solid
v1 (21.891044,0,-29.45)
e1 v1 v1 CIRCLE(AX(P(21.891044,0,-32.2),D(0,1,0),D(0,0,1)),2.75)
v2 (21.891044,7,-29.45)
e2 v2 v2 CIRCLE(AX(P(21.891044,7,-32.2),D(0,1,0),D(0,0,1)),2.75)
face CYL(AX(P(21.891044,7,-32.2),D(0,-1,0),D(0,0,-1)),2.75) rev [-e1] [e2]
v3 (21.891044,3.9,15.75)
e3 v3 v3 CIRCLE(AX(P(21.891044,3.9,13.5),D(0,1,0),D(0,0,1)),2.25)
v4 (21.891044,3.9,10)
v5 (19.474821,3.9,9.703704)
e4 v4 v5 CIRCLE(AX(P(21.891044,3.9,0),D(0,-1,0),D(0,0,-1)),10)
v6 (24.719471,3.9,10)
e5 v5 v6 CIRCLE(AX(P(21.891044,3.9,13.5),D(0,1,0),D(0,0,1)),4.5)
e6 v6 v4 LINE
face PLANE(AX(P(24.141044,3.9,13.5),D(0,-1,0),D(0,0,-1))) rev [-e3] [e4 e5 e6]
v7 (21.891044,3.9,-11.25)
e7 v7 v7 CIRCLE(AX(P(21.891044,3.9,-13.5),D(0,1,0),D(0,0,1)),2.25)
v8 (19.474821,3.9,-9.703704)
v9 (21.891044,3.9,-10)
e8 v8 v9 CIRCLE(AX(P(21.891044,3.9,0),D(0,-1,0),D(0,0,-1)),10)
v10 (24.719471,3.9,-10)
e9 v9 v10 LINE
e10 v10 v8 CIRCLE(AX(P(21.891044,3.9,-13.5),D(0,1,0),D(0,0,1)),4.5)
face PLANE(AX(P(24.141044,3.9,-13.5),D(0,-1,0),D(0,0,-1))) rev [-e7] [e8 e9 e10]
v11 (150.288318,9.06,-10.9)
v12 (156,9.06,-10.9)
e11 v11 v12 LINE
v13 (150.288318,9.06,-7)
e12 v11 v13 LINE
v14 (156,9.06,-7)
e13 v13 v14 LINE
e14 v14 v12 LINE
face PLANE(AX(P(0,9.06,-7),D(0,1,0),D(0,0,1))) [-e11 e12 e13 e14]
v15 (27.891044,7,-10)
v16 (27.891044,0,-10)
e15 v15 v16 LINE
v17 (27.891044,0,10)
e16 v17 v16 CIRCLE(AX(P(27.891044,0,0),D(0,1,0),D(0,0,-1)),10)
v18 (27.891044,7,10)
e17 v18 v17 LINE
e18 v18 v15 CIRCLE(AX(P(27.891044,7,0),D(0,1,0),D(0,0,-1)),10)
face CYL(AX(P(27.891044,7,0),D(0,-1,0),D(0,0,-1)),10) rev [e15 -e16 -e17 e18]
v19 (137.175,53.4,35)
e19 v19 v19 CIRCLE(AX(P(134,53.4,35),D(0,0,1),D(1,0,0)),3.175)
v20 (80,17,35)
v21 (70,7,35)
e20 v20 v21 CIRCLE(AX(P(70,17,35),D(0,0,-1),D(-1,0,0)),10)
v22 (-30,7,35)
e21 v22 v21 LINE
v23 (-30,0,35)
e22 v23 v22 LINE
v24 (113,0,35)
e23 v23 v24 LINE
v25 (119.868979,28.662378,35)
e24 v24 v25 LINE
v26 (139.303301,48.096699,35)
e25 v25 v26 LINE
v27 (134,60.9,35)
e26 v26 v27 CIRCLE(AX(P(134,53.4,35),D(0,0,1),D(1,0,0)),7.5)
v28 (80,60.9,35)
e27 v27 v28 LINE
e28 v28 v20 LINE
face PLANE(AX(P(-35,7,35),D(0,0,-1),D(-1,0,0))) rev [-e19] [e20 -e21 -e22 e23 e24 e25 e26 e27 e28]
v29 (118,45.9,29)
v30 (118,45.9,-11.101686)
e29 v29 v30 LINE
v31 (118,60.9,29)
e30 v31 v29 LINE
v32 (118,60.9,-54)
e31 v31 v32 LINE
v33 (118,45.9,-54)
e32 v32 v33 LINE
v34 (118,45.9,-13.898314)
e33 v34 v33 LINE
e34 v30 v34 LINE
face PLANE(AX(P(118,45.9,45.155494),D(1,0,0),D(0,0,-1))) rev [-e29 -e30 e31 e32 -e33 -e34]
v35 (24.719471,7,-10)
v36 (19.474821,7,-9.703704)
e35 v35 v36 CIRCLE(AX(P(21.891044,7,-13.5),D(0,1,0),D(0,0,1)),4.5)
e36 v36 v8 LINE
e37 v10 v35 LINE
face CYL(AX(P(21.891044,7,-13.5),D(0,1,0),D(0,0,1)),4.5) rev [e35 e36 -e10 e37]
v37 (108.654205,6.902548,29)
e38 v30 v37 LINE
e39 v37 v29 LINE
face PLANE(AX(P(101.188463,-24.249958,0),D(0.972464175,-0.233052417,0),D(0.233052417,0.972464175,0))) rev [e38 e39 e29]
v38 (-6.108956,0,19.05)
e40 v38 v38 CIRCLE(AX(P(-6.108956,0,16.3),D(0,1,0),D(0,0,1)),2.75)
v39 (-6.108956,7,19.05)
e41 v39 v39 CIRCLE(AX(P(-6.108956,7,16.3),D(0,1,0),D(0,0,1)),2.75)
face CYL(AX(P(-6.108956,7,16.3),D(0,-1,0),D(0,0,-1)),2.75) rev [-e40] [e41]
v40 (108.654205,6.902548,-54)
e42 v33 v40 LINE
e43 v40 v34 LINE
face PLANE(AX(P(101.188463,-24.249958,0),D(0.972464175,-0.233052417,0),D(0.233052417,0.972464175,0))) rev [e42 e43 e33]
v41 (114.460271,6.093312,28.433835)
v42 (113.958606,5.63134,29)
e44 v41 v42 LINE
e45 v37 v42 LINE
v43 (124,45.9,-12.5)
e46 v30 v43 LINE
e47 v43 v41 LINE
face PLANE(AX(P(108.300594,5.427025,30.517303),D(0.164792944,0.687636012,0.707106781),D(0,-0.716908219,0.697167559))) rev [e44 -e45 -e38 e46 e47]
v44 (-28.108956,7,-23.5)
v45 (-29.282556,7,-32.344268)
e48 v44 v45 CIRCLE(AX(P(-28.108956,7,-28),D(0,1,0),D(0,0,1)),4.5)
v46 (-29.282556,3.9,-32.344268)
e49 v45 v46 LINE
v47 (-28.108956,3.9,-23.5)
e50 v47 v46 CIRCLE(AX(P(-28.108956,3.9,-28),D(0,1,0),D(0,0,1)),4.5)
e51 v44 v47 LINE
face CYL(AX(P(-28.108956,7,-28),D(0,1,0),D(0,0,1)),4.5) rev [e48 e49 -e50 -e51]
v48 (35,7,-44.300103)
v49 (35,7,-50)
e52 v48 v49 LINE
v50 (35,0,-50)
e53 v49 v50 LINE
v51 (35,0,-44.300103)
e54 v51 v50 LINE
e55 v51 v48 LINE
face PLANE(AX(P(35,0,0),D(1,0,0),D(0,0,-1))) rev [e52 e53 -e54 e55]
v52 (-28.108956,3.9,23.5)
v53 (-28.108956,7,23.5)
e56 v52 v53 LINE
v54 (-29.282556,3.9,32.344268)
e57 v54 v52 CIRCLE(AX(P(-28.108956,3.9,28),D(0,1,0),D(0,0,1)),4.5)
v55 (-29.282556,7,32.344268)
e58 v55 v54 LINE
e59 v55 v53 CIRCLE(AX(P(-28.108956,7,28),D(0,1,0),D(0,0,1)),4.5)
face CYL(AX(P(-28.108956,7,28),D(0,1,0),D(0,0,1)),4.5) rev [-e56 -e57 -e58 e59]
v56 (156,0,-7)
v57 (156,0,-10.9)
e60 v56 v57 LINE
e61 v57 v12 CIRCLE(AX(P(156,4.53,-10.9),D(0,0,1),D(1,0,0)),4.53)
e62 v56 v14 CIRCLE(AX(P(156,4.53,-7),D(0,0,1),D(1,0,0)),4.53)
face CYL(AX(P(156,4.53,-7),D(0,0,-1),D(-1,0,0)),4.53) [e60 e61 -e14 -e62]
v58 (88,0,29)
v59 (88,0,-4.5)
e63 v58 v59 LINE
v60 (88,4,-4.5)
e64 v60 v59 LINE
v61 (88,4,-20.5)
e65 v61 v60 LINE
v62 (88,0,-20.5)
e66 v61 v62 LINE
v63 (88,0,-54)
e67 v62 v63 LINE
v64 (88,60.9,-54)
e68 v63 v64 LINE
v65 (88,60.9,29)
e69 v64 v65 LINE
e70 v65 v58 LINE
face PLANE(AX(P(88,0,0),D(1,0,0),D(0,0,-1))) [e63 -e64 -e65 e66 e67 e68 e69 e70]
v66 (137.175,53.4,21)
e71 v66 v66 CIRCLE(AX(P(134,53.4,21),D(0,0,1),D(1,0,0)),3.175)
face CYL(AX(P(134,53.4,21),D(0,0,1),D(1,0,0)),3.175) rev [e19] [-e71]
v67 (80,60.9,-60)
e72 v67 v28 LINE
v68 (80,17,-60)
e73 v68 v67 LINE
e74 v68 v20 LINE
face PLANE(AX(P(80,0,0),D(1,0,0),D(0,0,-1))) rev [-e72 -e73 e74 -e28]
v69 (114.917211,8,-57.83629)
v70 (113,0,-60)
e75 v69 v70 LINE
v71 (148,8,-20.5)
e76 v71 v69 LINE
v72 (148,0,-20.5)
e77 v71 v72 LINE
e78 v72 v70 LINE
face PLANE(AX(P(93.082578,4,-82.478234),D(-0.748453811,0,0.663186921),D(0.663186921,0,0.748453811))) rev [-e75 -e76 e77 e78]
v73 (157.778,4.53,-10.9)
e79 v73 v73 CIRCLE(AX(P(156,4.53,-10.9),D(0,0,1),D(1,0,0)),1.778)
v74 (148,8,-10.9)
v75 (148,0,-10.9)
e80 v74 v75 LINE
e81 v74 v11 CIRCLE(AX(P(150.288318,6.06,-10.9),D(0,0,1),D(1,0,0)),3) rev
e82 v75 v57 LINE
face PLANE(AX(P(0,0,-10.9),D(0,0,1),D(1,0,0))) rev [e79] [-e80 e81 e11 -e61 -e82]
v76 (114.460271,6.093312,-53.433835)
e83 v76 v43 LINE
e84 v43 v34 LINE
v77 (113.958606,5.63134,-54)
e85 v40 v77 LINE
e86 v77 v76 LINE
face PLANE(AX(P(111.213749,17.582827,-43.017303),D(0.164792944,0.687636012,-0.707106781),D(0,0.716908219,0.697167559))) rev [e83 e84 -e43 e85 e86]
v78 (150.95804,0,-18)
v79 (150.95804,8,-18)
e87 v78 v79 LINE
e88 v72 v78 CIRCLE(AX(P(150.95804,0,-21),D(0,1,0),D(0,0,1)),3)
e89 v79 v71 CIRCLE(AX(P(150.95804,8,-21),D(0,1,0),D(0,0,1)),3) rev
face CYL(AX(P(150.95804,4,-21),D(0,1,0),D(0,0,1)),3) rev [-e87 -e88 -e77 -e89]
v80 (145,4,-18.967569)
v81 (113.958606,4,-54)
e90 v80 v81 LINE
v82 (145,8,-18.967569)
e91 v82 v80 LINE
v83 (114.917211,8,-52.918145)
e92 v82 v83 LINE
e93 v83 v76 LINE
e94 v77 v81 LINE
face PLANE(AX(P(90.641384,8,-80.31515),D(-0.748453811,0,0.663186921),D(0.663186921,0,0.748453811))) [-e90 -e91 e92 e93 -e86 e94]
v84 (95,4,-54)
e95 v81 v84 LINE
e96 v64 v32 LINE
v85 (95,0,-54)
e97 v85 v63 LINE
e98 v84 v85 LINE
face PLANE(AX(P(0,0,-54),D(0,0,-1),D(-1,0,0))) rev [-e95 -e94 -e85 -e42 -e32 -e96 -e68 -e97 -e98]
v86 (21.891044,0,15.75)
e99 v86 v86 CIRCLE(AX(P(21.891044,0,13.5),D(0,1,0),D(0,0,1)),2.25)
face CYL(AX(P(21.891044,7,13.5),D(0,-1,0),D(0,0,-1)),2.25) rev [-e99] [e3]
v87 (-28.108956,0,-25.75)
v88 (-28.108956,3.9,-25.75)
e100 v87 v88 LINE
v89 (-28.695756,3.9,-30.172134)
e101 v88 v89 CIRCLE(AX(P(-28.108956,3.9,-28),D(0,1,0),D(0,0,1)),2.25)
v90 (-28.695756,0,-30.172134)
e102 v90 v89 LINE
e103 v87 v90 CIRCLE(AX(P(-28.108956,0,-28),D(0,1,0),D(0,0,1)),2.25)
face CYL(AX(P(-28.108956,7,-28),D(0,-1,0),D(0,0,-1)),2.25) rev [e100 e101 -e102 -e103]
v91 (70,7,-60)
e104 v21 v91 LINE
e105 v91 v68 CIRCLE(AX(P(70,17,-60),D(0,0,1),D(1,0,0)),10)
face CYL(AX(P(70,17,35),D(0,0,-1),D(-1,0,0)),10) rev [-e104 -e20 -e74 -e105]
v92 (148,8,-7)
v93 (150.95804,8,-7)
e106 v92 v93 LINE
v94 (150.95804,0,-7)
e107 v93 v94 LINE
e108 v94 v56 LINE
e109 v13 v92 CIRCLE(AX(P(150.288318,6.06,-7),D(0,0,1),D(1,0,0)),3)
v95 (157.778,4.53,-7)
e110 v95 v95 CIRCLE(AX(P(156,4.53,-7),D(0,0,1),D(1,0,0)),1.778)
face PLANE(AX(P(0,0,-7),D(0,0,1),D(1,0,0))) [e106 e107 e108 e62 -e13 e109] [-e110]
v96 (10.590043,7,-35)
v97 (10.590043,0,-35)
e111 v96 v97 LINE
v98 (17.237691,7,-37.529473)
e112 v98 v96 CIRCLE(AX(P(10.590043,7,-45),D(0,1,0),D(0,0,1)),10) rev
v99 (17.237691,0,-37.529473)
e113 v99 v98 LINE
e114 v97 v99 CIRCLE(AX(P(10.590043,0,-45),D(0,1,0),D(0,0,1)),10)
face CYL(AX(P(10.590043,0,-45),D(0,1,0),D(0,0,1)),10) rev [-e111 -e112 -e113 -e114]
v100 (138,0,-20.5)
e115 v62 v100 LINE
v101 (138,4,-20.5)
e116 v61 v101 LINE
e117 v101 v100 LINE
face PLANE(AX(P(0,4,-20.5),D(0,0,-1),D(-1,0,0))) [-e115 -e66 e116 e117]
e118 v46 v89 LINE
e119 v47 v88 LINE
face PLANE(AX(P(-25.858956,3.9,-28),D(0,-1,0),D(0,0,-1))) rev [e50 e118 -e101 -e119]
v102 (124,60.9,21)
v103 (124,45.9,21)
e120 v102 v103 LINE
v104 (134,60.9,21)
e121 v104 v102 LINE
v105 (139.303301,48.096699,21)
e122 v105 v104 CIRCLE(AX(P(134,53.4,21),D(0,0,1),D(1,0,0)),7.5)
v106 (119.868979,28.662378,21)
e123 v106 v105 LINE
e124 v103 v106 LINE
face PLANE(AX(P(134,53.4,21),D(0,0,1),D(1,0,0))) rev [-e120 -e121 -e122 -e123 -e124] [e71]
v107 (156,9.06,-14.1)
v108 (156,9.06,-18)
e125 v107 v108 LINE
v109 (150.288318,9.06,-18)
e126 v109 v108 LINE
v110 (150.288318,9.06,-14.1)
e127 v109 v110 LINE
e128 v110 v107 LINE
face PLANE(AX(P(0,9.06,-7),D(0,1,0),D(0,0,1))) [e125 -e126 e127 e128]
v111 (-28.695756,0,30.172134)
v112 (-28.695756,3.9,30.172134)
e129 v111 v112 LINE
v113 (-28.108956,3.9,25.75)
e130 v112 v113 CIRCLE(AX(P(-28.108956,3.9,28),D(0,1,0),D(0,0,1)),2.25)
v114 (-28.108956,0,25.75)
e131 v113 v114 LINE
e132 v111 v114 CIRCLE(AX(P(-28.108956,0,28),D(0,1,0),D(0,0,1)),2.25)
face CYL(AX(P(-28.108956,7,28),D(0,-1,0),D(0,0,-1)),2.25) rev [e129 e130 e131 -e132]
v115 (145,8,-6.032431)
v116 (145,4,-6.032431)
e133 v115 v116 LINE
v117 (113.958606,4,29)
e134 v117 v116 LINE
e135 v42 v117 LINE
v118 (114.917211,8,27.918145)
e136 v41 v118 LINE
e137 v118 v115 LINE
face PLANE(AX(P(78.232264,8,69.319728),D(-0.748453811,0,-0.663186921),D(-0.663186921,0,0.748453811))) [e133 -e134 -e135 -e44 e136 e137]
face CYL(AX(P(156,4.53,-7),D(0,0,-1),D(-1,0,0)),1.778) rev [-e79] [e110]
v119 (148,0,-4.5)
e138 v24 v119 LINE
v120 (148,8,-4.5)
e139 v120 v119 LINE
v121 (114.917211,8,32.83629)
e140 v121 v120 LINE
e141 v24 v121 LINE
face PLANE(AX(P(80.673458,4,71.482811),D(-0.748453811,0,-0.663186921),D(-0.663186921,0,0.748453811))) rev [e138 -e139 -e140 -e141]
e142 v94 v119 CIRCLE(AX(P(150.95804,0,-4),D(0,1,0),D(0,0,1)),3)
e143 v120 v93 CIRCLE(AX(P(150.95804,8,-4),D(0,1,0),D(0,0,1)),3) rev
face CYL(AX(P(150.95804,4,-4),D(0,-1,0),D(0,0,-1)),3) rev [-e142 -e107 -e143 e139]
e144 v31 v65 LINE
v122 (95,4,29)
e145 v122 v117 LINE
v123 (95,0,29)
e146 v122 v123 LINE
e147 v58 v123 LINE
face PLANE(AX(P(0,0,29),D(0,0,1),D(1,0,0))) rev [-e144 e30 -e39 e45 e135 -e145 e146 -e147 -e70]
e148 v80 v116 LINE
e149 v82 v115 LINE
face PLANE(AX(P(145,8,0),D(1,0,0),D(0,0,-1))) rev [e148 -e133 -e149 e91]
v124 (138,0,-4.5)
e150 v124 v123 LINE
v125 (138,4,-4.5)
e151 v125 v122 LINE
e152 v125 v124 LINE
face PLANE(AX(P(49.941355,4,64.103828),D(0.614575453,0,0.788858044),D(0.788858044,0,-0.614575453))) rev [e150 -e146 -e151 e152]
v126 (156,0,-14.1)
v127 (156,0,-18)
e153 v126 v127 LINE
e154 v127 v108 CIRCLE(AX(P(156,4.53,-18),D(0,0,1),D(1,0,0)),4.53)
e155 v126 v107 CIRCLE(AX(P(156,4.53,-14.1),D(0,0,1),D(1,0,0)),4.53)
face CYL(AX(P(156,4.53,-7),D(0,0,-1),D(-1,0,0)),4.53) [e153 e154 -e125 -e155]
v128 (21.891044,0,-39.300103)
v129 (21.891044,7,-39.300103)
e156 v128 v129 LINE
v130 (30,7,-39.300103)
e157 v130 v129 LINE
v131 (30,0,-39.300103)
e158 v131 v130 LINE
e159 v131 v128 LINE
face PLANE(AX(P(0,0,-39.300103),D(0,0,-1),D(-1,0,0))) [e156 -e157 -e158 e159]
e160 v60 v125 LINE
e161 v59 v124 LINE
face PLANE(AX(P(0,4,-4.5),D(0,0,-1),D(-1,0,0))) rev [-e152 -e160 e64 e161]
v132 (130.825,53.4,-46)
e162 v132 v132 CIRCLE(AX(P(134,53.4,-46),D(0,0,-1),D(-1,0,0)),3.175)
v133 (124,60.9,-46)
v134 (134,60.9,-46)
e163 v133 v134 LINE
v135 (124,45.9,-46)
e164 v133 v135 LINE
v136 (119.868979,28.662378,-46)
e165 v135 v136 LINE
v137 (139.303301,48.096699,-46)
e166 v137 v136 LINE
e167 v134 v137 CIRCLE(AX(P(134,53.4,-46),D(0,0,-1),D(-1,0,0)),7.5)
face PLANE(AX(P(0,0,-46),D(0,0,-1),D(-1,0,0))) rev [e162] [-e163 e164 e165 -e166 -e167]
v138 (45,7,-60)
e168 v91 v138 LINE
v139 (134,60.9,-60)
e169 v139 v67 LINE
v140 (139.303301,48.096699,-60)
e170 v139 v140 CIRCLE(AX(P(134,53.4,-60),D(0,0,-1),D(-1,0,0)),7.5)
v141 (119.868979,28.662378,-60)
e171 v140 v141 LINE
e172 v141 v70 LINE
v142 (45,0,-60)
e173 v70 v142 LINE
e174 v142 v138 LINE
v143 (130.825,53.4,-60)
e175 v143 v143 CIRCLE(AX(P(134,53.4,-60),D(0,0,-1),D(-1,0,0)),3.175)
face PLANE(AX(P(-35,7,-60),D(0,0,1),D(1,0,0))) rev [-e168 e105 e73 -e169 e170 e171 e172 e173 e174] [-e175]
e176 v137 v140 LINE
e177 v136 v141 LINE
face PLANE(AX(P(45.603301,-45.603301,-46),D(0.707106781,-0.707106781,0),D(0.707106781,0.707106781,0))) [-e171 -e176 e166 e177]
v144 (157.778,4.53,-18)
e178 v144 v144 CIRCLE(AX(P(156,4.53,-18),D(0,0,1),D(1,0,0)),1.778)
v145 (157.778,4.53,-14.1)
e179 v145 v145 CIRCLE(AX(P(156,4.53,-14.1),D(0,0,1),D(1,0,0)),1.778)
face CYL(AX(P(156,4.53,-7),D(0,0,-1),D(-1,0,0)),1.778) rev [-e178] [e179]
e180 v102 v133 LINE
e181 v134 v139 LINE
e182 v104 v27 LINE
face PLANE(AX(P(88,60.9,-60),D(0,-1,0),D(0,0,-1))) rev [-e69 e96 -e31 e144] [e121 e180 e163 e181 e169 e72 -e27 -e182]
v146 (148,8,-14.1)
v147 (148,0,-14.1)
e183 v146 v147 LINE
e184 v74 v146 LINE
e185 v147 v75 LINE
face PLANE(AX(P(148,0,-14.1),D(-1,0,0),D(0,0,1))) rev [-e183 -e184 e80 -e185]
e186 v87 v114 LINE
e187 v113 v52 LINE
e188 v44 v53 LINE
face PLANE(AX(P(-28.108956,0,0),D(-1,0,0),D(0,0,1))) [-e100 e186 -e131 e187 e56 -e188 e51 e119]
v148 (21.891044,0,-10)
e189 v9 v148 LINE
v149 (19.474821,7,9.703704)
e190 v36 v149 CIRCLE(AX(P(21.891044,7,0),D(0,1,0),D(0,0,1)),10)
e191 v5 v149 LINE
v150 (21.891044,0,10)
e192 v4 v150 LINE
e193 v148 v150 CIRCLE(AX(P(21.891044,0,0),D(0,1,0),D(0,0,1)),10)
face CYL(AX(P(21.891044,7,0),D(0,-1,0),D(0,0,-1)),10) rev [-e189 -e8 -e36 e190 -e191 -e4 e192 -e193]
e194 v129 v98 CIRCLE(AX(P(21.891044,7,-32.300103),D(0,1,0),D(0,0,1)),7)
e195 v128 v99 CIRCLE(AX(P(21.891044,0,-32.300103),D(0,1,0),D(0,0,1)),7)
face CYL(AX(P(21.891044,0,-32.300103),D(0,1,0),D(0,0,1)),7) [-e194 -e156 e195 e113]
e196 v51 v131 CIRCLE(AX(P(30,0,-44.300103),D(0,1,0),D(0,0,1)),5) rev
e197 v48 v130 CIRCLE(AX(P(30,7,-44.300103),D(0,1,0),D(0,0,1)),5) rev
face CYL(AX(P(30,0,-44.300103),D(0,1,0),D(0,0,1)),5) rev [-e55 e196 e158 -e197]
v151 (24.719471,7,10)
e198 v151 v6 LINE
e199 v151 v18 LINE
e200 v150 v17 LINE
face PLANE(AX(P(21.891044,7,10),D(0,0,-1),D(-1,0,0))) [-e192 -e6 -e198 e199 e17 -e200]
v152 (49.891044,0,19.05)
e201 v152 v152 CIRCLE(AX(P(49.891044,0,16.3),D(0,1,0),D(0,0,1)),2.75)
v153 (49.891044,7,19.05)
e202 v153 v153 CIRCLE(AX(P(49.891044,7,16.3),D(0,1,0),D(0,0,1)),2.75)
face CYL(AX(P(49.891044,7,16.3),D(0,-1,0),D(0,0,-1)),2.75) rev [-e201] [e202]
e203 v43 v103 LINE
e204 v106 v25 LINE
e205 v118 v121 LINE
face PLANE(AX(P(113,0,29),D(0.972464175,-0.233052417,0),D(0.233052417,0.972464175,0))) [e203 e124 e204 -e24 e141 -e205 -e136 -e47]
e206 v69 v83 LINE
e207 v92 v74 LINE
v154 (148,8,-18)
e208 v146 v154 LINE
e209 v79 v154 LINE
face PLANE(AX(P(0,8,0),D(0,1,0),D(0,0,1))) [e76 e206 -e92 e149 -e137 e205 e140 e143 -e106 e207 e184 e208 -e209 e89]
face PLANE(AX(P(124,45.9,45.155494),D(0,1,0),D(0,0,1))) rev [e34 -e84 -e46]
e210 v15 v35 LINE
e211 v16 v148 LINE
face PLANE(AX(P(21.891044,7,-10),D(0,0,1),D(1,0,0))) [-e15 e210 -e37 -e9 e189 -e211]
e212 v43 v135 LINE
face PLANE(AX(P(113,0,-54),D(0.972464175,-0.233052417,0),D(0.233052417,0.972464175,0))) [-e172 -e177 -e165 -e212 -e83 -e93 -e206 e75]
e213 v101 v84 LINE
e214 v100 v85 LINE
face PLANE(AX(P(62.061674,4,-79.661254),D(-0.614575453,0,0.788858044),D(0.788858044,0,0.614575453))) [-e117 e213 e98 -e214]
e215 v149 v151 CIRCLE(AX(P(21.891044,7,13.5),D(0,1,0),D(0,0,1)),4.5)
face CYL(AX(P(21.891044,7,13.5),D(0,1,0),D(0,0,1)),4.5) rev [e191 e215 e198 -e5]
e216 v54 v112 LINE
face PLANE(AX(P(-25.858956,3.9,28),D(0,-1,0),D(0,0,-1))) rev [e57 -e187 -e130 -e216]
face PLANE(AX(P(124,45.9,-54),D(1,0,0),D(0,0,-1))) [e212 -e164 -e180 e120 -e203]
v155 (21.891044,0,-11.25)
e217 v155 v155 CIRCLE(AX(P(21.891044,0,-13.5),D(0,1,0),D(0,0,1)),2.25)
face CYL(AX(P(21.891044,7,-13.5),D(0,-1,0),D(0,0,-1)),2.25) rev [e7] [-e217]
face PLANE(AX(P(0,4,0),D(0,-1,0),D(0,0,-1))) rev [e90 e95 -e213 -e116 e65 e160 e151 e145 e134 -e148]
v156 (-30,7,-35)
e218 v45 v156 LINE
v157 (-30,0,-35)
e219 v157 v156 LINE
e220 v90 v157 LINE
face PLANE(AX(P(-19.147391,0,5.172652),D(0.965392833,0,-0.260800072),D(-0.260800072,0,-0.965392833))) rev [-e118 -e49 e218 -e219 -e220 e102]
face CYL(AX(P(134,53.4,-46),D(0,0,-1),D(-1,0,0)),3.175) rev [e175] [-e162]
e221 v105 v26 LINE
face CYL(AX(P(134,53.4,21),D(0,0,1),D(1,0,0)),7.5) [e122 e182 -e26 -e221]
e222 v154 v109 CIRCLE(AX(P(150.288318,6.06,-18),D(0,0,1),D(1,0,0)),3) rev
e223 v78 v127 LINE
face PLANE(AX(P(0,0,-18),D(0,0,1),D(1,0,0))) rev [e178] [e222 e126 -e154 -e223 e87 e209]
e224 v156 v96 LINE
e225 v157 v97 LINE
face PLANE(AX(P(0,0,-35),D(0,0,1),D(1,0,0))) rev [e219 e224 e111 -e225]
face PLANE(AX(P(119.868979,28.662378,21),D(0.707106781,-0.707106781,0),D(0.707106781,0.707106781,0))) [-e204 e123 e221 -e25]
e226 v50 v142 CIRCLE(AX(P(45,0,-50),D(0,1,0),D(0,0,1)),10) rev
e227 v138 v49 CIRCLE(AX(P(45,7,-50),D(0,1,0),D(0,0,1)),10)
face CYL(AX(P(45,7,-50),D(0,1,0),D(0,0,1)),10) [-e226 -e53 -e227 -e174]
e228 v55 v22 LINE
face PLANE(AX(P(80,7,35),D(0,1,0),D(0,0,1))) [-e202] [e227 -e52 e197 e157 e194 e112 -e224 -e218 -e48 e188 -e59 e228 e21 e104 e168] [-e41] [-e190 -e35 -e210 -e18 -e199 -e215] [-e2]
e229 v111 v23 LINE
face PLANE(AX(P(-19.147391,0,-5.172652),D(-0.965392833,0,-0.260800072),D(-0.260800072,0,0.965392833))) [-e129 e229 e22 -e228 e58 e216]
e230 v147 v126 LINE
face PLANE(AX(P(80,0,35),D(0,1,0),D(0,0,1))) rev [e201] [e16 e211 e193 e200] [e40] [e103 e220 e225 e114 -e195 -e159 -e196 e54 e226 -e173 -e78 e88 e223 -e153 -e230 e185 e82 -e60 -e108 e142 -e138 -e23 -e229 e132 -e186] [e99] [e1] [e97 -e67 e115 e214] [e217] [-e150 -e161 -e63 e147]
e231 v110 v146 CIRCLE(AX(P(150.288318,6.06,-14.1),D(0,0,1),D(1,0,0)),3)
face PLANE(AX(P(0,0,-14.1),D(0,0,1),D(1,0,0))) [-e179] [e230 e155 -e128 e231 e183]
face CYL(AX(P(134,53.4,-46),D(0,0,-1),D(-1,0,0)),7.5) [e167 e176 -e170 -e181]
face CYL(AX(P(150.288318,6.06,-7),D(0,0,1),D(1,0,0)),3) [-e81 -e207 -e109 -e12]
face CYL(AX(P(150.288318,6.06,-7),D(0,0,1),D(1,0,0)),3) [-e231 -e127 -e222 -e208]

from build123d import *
from build123d.topology import SkipClean

# Parameters (mm, degrees)
SKETCH1_W                                        = 115
SKETCH1_H                                        = 95
EXTRUDE1_DEPTH                                   = 7
SKETCH2_R                                        = 2.75
SKETCH2_R_2                                      = 2.25
EXTRUDE7_DEPTH                                   = 7
CBORE_FOR_M4_PAN_HEAD_MACHINE_SCREW2_D           = 4.5
CBORE_FOR_M4_PAN_HEAD_MACHINE_SCREW2_CBORE_D     = 9
CBORE_FOR_M4_PAN_HEAD_MACHINE_SCREW2_CBORE_DEPTH = 3.1
EXTRUDE9_DEPTH                                   = 101.244700608
FILLET1_R                                        = 10
SKETCH19_W                                       = 95
SKETCH19_H                                       = 60.9
BOSS_EXTRUDE1_DEPTH                              = 8
BOSS_EXTRUDE2_DEPTH                              = 6
BOSS_EXTRUDE3_DEPTH                              = 6
SKETCH22_W                                       = 6
SKETCH22_H                                       = 15
BOSS_EXTRUDE4_DEPTH                              = 83
BOSS_EXTRUDE5_DEPTH                              = 5.834785
SKETCH25_R                                       = 3.175
BOSS_EXTRUDE6_DEPTH                              = 14
BOSS_EXTRUDE7_START                              = -14
SKETCH26_R                                       = 3.175
BOSS_EXTRUDE7_DEPTH                              = 14
FILLET2_R                                        = 10
BOSS_EXTRUDE8_DEPTH                              = 4
BOSS_EXTRUDE9_DEPTH                              = 4
BOSS_EXTRUDE10_DEPTH                             = 5.5
CUT_EXTRUDE1_DEPTH                               = 1.6
FILLET3_R                                        = 3


with BuildPart() as part:
    # Sketch1 → Extrude1 (new body)
    with BuildSketch(Plane(origin=(0, 0, 0), x_dir=(1, 0, 0), z_dir=(0, 1, 0))):
        with Locations((22.5, 12.5)):
            Rectangle(SKETCH1_W, SKETCH1_H)
    extrude(amount=EXTRUDE1_DEPTH)

    # Sketch2 → Extrude7 (cut)
    with BuildSketch(Plane(origin=(0, 0, 0), x_dir=(1, 0, 0), z_dir=(0, 1, 0))):
        with Locations(Location((-6.108955811, -16.3, 0), (0, 0, 270))):
            Circle(SKETCH2_R)
        with Locations(Location((49.891044189, -16.3, 0), (0, 0, 270))):
            Circle(SKETCH2_R)
        with Locations(Location((-28.108955811, -28, 0), (0, 0, 270))):
            Circle(SKETCH2_R_2)
        with Locations(Location((-28.108955811, 28, 0), (0, 0, 270))):
            Circle(SKETCH2_R_2)
        with Locations(Location((21.891044189, 32.2, 0), (0, 0, 270))):
            Circle(SKETCH2_R)
        with Locations(Location((21.891044189, -13.5, 0), (0, 0, 270))):
            Circle(SKETCH2_R_2)
        with Locations(Location((21.891044189, 13.5, 0), (0, 0, 270))):
            Circle(SKETCH2_R_2)
        with BuildLine():
            Line((21.891044189, 10), (27.891044189, 10))
            ThreePointArc((27.891044189, 10), (37.891044189, 0), (27.891044189, -10))
            Line((27.891044189, -10), (21.891044189, -10))
            ThreePointArc((21.891044189, -10), (11.891044189, 0), (21.891044189, 10))
        make_face()
    extrude(amount=EXTRUDE7_DEPTH, mode=Mode.SUBTRACT)

    # CBORE for M4 Pan Head Machine Screw2 (through all)
    with Locations(Plane(origin=(-28.108955811, 7, -28), x_dir=(0, 0, 1), z_dir=(0, 1, 0))):
        with Locations((0, 0), (14.5, 50), (41.5, 50), (56, 0)):
            CounterBoreHole(CBORE_FOR_M4_PAN_HEAD_MACHINE_SCREW2_D / 2, CBORE_FOR_M4_PAN_HEAD_MACHINE_SCREW2_CBORE_D / 2, CBORE_FOR_M4_PAN_HEAD_MACHINE_SCREW2_CBORE_DEPTH)

    # Sketch18 → Extrude9 (cut, through all)
    with BuildSketch(Plane(origin=(0, 7, 0), x_dir=(1, 0, 0), z_dir=(0, 1, 0))):
        with BuildLine():
            Line((21.891044189, 39.300103485), (30, 39.300103485))
            ThreePointArc((30, 39.300103485), (33.535533906, 40.764569579), (35, 44.300103485))
            Line((35, 44.300103485), (35, 60))
            Line((35, 60), (-35, 60))
            Line((-35, 60), (-35, 35))
            Line((-35, 35), (-35, -35))
            Line((-35, -35), (-30, -35))
            Line((-30, -35), (-28.108955811, -28))
            Line((-28.108955811, -28), (-28.108955811, 28))
            Line((-28.108955811, 28), (-30, 35))
            Line((-30, 35), (15.43267297, 35))
            ThreePointArc((15.43267297, 35), (18.01156456, 38.126735256), (21.891044189, 39.300103485))
        make_face()
    extrude(amount=-EXTRUDE9_DEPTH, mode=Mode.SUBTRACT)

    # Fillet1
    fillet1_edges = [part.edges().sort_by_distance(p)[0] for p in [
        (15.43267297, 3.5, -35),
        (35, 3.5, -60),
    ]]
    fillet(fillet1_edges, radius=FILLET1_R)

    # Sketch19 → Boss-Extrude1 (add)
    with BuildSketch(Plane(origin=(80, 0, 0), x_dir=(0, 0, -1), z_dir=(1, 0, 0))):
        with Locations((12.5, 30.45)):
            Rectangle(SKETCH19_W, SKETCH19_H)
    extrude(amount=BOSS_EXTRUDE1_DEPTH)

    # Sketch20 → Boss-Extrude2 (add)
    with BuildSketch(Plane(origin=(0, 0, -60), x_dir=(-1, 0, 0), z_dir=(0, 0, -1))):
        Polygon((-88, 0), (-113, 0), (-124, 45.9), (-124, 60.9), (-88, 60.9), (-80, 60.9), (-80, 7), (-45, 7), (-45, 0), align=None)
    extrude(amount=-BOSS_EXTRUDE2_DEPTH)

    # Sketch21 → Boss-Extrude3 (add)
    with BuildSketch(Plane.XY.offset(35)):
        Polygon((88, 60.9), (88, 0), (113, 0), (124, 45.9), (124, 60.9), align=None)
    extrude(amount=-BOSS_EXTRUDE3_DEPTH)

    # Sketch22 → Boss-Extrude4 (add)
    with BuildSketch(Plane.XY.offset(-54)):
        with Locations((121, 53.4)):
            Rectangle(SKETCH22_W, SKETCH22_H)
    extrude(amount=BOSS_EXTRUDE4_DEPTH)

    # Sketch23 → Boss-Extrude5 (add)
    with BuildSketch(Plane(origin=(106.862582536, -25.609769235, 0), x_dir=(0, 0, -1), z_dir=(0.9724641747215814, -0.2330524165999433, 0))):
        Polygon((12.5, 73.534605278), (54, 32.034605278), (54, 73.534605278), align=None)
        Polygon((-29, 32.034605278), (12.5, 73.534605278), (-29, 73.534605278), align=None)
    extrude(amount=-BOSS_EXTRUDE5_DEPTH)

    # Sketch25 → Boss-Extrude6 (add)
    # profile 1 of 2: a face of its own
    with BuildSketch(Plane(origin=(0, 0, -60), x_dir=(-1, 0, 0), z_dir=(0, 0, -1))):
        with BuildLine():
            Line((-124, 60.9), (-134, 60.9))
            ThreePointArc((-134, 60.9), (-141.5, 53.4), (-134, 45.9))
            Line((-134, 45.9), (-124, 45.9))
            Line((-124, 45.9), (-124, 60.9))
        make_face()
        with Locations((-134, 53.4)):
            Circle(SKETCH25_R, mode=Mode.SUBTRACT)
    # profile 2 of 2: a face of its own
    with BuildSketch(Plane(origin=(0, 0, -60), x_dir=(-1, 0, 0), z_dir=(0, 0, -1))):
        with BuildLine():
            Line((-119.868979401, 28.662377683), (-124, 45.9))
            Line((-124, 45.9), (-134, 45.9))
            ThreePointArc((-134, 45.9), (-136.870125743, 46.470903506), (-139.303300859, 48.096699141))
            Line((-139.303300859, 48.096699141), (-119.868979401, 28.662377683))
        make_face()
    extrude(amount=-BOSS_EXTRUDE6_DEPTH)

    # Sketch26 → Boss-Extrude7 (add)
    with BuildSketch(Plane.XY.offset(35).offset(BOSS_EXTRUDE7_START)):
        with BuildLine():
            Line((134, 60.9), (124, 60.9))
            Line((124, 60.9), (124, 45.9))
            Line((124, 45.9), (119.868979401, 28.662377683))
            Line((119.868979401, 28.662377683), (139.303300859, 48.096699141))
            ThreePointArc((139.303300859, 48.096699141), (140.929096494, 56.270125743), (134, 60.9))
        make_face()
        with Locations(Location((134, 53.4, 0), (0, 0, 180))):
            Circle(SKETCH26_R, mode=Mode.SUBTRACT)
    extrude(amount=BOSS_EXTRUDE7_DEPTH)

    # Fillet2
    fillet2_edges = [part.edges().sort_by_distance(p)[0] for p in [
        (80, 7, -12.5),
    ]]
    fillet(fillet2_edges, radius=FILLET2_R)

    # Sketch27 → Boss-Extrude8 (add)
    with BuildSketch(Plane.XZ):
        Polygon((95, 29), (138, -4.5), (148, -4.5), (113, 35), (113, 29), align=None)
        Polygon((138, -4.5), (88, -4.5), (88, -12.5), (148, -12.5), (148, -4.5), align=None)
        Polygon((148, -20.5), (138, -20.5), (95, -54), (113, -54), (113, -60), align=None)
        Polygon((148, -12.5), (88, -12.5), (88, -20.5), (138, -20.5), (148, -20.5), align=None)
    extrude(amount=-BOSS_EXTRUDE8_DEPTH)

    # Sketch28 → Boss-Extrude9 (add)
    with BuildSketch(Plane(origin=(0, 4, 0), x_dir=(1, 0, 0), z_dir=(0, 1, 0))):
        Polygon((148, 20.5), (113.958605664, 58.918145036), (113.958605664, 54), (145, 18.96756925), (145, 6.03243075), (113.958605664, -29), (113.958605664, -33.918145036), (148, 4.5), align=None)
    extrude(amount=BOSS_EXTRUDE9_DEPTH)

    # Sketch29 → Boss-Extrude10 (add, symmetric)
    with SkipClean():  # the faces are left unmerged after this step: merging them gives an invalid solid
        with BuildSketch(Plane.XY.offset(-12.5)):
            with BuildLine():
                ThreePointArc((160.53, 4.53), (159.203193719, 7.733193719), (156, 9.06))
                Line((156, 9.06), (156, 6.308))
                ThreePointArc((156, 6.308), (157.257235857, 5.787235857), (157.778, 4.53))
                ThreePointArc((157.778, 4.53), (157.257235857, 3.272764143), (156, 2.752))
                Line((156, 2.752), (156, 0))
                ThreePointArc((156, 0), (159.203193719, 1.326806281), (160.53, 4.53))
            make_face()
            with BuildLine():
                Line((156, 6.308), (156, 9.06))
                ThreePointArc((156, 9.06), (151.47, 4.53), (156, 0))
                Line((156, 0), (156, 2.752))
                ThreePointArc((156, 2.752), (154.222, 4.53), (156, 6.308))
            make_face()
            with BuildLine():
                Line((156, 9.06), (148, 9.06))
                Line((148, 9.06), (148, 0))
                Line((148, 0), (156, 0))
                ThreePointArc((156, 0), (151.47, 4.53), (156, 9.06))
            make_face()
        extrude(amount=BOSS_EXTRUDE10_DEPTH, both=True)

    # Sketch29<3> → Cut-Extrude1 (cut, symmetric)
    with BuildSketch(Plane.XY.offset(-12.5)):
        with BuildLine():
            Line((156, 9.06), (148, 9.06))
            Line((148, 9.06), (148, 0))
            Line((148, 0), (156, 0))
            ThreePointArc((156, 0), (151.47, 4.53), (156, 9.06))
        make_face()
        with BuildLine():
            ThreePointArc((160.53, 4.53), (159.203193719, 7.733193719), (156, 9.06))
            Line((156, 9.06), (156, 6.308))
            ThreePointArc((156, 6.308), (157.257235857, 5.787235857), (157.778, 4.53))
            ThreePointArc((157.778, 4.53), (157.257235857, 3.272764143), (156, 2.752))
            Line((156, 2.752), (156, 0))
            ThreePointArc((156, 0), (159.203193719, 1.326806281), (160.53, 4.53))
        make_face()
        with BuildLine():
            Line((156, 6.308), (156, 9.06))
            ThreePointArc((156, 9.06), (151.47, 4.53), (156, 0))
            Line((156, 0), (156, 2.752))
            ThreePointArc((156, 2.752), (154.222, 4.53), (156, 6.308))
        make_face()
    extrude(amount=CUT_EXTRUDE1_DEPTH, both=True, mode=Mode.SUBTRACT)

    # Fillet3
    # the kernel refuses this fillet: 3 mm, written as the material it adds along each edge
    with BuildSketch(Plane(origin=(148, 8, -18), x_dir=(0, 0, -1), z_dir=(0, -1, 0))) as fillet3_piece_1:
        with BuildLine():
            CenterArc((3, 2.958039892), FILLET3_R, 180, 80.405931773)
            Line((0, 2.958039892), (0, 0))
            Line((0, 0), (2.5, 0))
        make_face()
    extrude(amount=8)
    with BuildSketch(Plane(origin=(148, 8, -7), x_dir=(1, 0, 0), z_dir=(0, -1, 0))) as fillet3_piece_2:
        with BuildLine():
            CenterArc((2.958039892, 3), FILLET3_R, 189.594068227, 80.405931773)
            Line((0, 2.5), (0, 0))
            Line((0, 0), (2.958039892, 0))
        make_face()
    extrude(amount=8)
    # the kernel refuses this fillet: 3 mm, written as the material it takes off along each edge
    with BuildSketch(Plane(origin=(148, 9.06, -16.620795399), x_dir=(0, -1, 0), z_dir=(0, 0, 1))) as fillet3_2_piece_1:
        with BuildLine():
            CenterArc((3, 2.28831816), FILLET3_R, 180, 49.709248271)
            Line((0, 2.28831816), (0, 0))
            Line((0, 0), (1.06, 0))
        make_face()
    extrude(amount=15.341590798, mode=Mode.SUBTRACT)
    with BuildSketch(Plane(origin=(148, 9.06, -23.720795399), x_dir=(1, 0, 0), z_dir=(0, 0, 1))) as fillet3_2_piece_2:
        with BuildLine():
            CenterArc((2.28831816, -3), FILLET3_R, 90, 49.709248271)
            Line((0, -1.06), (0, 0))
            Line((0, 0), (2.28831816, 0))
        make_face()
    extrude(amount=15.341590798, mode=Mode.SUBTRACT)


solid = part.part
